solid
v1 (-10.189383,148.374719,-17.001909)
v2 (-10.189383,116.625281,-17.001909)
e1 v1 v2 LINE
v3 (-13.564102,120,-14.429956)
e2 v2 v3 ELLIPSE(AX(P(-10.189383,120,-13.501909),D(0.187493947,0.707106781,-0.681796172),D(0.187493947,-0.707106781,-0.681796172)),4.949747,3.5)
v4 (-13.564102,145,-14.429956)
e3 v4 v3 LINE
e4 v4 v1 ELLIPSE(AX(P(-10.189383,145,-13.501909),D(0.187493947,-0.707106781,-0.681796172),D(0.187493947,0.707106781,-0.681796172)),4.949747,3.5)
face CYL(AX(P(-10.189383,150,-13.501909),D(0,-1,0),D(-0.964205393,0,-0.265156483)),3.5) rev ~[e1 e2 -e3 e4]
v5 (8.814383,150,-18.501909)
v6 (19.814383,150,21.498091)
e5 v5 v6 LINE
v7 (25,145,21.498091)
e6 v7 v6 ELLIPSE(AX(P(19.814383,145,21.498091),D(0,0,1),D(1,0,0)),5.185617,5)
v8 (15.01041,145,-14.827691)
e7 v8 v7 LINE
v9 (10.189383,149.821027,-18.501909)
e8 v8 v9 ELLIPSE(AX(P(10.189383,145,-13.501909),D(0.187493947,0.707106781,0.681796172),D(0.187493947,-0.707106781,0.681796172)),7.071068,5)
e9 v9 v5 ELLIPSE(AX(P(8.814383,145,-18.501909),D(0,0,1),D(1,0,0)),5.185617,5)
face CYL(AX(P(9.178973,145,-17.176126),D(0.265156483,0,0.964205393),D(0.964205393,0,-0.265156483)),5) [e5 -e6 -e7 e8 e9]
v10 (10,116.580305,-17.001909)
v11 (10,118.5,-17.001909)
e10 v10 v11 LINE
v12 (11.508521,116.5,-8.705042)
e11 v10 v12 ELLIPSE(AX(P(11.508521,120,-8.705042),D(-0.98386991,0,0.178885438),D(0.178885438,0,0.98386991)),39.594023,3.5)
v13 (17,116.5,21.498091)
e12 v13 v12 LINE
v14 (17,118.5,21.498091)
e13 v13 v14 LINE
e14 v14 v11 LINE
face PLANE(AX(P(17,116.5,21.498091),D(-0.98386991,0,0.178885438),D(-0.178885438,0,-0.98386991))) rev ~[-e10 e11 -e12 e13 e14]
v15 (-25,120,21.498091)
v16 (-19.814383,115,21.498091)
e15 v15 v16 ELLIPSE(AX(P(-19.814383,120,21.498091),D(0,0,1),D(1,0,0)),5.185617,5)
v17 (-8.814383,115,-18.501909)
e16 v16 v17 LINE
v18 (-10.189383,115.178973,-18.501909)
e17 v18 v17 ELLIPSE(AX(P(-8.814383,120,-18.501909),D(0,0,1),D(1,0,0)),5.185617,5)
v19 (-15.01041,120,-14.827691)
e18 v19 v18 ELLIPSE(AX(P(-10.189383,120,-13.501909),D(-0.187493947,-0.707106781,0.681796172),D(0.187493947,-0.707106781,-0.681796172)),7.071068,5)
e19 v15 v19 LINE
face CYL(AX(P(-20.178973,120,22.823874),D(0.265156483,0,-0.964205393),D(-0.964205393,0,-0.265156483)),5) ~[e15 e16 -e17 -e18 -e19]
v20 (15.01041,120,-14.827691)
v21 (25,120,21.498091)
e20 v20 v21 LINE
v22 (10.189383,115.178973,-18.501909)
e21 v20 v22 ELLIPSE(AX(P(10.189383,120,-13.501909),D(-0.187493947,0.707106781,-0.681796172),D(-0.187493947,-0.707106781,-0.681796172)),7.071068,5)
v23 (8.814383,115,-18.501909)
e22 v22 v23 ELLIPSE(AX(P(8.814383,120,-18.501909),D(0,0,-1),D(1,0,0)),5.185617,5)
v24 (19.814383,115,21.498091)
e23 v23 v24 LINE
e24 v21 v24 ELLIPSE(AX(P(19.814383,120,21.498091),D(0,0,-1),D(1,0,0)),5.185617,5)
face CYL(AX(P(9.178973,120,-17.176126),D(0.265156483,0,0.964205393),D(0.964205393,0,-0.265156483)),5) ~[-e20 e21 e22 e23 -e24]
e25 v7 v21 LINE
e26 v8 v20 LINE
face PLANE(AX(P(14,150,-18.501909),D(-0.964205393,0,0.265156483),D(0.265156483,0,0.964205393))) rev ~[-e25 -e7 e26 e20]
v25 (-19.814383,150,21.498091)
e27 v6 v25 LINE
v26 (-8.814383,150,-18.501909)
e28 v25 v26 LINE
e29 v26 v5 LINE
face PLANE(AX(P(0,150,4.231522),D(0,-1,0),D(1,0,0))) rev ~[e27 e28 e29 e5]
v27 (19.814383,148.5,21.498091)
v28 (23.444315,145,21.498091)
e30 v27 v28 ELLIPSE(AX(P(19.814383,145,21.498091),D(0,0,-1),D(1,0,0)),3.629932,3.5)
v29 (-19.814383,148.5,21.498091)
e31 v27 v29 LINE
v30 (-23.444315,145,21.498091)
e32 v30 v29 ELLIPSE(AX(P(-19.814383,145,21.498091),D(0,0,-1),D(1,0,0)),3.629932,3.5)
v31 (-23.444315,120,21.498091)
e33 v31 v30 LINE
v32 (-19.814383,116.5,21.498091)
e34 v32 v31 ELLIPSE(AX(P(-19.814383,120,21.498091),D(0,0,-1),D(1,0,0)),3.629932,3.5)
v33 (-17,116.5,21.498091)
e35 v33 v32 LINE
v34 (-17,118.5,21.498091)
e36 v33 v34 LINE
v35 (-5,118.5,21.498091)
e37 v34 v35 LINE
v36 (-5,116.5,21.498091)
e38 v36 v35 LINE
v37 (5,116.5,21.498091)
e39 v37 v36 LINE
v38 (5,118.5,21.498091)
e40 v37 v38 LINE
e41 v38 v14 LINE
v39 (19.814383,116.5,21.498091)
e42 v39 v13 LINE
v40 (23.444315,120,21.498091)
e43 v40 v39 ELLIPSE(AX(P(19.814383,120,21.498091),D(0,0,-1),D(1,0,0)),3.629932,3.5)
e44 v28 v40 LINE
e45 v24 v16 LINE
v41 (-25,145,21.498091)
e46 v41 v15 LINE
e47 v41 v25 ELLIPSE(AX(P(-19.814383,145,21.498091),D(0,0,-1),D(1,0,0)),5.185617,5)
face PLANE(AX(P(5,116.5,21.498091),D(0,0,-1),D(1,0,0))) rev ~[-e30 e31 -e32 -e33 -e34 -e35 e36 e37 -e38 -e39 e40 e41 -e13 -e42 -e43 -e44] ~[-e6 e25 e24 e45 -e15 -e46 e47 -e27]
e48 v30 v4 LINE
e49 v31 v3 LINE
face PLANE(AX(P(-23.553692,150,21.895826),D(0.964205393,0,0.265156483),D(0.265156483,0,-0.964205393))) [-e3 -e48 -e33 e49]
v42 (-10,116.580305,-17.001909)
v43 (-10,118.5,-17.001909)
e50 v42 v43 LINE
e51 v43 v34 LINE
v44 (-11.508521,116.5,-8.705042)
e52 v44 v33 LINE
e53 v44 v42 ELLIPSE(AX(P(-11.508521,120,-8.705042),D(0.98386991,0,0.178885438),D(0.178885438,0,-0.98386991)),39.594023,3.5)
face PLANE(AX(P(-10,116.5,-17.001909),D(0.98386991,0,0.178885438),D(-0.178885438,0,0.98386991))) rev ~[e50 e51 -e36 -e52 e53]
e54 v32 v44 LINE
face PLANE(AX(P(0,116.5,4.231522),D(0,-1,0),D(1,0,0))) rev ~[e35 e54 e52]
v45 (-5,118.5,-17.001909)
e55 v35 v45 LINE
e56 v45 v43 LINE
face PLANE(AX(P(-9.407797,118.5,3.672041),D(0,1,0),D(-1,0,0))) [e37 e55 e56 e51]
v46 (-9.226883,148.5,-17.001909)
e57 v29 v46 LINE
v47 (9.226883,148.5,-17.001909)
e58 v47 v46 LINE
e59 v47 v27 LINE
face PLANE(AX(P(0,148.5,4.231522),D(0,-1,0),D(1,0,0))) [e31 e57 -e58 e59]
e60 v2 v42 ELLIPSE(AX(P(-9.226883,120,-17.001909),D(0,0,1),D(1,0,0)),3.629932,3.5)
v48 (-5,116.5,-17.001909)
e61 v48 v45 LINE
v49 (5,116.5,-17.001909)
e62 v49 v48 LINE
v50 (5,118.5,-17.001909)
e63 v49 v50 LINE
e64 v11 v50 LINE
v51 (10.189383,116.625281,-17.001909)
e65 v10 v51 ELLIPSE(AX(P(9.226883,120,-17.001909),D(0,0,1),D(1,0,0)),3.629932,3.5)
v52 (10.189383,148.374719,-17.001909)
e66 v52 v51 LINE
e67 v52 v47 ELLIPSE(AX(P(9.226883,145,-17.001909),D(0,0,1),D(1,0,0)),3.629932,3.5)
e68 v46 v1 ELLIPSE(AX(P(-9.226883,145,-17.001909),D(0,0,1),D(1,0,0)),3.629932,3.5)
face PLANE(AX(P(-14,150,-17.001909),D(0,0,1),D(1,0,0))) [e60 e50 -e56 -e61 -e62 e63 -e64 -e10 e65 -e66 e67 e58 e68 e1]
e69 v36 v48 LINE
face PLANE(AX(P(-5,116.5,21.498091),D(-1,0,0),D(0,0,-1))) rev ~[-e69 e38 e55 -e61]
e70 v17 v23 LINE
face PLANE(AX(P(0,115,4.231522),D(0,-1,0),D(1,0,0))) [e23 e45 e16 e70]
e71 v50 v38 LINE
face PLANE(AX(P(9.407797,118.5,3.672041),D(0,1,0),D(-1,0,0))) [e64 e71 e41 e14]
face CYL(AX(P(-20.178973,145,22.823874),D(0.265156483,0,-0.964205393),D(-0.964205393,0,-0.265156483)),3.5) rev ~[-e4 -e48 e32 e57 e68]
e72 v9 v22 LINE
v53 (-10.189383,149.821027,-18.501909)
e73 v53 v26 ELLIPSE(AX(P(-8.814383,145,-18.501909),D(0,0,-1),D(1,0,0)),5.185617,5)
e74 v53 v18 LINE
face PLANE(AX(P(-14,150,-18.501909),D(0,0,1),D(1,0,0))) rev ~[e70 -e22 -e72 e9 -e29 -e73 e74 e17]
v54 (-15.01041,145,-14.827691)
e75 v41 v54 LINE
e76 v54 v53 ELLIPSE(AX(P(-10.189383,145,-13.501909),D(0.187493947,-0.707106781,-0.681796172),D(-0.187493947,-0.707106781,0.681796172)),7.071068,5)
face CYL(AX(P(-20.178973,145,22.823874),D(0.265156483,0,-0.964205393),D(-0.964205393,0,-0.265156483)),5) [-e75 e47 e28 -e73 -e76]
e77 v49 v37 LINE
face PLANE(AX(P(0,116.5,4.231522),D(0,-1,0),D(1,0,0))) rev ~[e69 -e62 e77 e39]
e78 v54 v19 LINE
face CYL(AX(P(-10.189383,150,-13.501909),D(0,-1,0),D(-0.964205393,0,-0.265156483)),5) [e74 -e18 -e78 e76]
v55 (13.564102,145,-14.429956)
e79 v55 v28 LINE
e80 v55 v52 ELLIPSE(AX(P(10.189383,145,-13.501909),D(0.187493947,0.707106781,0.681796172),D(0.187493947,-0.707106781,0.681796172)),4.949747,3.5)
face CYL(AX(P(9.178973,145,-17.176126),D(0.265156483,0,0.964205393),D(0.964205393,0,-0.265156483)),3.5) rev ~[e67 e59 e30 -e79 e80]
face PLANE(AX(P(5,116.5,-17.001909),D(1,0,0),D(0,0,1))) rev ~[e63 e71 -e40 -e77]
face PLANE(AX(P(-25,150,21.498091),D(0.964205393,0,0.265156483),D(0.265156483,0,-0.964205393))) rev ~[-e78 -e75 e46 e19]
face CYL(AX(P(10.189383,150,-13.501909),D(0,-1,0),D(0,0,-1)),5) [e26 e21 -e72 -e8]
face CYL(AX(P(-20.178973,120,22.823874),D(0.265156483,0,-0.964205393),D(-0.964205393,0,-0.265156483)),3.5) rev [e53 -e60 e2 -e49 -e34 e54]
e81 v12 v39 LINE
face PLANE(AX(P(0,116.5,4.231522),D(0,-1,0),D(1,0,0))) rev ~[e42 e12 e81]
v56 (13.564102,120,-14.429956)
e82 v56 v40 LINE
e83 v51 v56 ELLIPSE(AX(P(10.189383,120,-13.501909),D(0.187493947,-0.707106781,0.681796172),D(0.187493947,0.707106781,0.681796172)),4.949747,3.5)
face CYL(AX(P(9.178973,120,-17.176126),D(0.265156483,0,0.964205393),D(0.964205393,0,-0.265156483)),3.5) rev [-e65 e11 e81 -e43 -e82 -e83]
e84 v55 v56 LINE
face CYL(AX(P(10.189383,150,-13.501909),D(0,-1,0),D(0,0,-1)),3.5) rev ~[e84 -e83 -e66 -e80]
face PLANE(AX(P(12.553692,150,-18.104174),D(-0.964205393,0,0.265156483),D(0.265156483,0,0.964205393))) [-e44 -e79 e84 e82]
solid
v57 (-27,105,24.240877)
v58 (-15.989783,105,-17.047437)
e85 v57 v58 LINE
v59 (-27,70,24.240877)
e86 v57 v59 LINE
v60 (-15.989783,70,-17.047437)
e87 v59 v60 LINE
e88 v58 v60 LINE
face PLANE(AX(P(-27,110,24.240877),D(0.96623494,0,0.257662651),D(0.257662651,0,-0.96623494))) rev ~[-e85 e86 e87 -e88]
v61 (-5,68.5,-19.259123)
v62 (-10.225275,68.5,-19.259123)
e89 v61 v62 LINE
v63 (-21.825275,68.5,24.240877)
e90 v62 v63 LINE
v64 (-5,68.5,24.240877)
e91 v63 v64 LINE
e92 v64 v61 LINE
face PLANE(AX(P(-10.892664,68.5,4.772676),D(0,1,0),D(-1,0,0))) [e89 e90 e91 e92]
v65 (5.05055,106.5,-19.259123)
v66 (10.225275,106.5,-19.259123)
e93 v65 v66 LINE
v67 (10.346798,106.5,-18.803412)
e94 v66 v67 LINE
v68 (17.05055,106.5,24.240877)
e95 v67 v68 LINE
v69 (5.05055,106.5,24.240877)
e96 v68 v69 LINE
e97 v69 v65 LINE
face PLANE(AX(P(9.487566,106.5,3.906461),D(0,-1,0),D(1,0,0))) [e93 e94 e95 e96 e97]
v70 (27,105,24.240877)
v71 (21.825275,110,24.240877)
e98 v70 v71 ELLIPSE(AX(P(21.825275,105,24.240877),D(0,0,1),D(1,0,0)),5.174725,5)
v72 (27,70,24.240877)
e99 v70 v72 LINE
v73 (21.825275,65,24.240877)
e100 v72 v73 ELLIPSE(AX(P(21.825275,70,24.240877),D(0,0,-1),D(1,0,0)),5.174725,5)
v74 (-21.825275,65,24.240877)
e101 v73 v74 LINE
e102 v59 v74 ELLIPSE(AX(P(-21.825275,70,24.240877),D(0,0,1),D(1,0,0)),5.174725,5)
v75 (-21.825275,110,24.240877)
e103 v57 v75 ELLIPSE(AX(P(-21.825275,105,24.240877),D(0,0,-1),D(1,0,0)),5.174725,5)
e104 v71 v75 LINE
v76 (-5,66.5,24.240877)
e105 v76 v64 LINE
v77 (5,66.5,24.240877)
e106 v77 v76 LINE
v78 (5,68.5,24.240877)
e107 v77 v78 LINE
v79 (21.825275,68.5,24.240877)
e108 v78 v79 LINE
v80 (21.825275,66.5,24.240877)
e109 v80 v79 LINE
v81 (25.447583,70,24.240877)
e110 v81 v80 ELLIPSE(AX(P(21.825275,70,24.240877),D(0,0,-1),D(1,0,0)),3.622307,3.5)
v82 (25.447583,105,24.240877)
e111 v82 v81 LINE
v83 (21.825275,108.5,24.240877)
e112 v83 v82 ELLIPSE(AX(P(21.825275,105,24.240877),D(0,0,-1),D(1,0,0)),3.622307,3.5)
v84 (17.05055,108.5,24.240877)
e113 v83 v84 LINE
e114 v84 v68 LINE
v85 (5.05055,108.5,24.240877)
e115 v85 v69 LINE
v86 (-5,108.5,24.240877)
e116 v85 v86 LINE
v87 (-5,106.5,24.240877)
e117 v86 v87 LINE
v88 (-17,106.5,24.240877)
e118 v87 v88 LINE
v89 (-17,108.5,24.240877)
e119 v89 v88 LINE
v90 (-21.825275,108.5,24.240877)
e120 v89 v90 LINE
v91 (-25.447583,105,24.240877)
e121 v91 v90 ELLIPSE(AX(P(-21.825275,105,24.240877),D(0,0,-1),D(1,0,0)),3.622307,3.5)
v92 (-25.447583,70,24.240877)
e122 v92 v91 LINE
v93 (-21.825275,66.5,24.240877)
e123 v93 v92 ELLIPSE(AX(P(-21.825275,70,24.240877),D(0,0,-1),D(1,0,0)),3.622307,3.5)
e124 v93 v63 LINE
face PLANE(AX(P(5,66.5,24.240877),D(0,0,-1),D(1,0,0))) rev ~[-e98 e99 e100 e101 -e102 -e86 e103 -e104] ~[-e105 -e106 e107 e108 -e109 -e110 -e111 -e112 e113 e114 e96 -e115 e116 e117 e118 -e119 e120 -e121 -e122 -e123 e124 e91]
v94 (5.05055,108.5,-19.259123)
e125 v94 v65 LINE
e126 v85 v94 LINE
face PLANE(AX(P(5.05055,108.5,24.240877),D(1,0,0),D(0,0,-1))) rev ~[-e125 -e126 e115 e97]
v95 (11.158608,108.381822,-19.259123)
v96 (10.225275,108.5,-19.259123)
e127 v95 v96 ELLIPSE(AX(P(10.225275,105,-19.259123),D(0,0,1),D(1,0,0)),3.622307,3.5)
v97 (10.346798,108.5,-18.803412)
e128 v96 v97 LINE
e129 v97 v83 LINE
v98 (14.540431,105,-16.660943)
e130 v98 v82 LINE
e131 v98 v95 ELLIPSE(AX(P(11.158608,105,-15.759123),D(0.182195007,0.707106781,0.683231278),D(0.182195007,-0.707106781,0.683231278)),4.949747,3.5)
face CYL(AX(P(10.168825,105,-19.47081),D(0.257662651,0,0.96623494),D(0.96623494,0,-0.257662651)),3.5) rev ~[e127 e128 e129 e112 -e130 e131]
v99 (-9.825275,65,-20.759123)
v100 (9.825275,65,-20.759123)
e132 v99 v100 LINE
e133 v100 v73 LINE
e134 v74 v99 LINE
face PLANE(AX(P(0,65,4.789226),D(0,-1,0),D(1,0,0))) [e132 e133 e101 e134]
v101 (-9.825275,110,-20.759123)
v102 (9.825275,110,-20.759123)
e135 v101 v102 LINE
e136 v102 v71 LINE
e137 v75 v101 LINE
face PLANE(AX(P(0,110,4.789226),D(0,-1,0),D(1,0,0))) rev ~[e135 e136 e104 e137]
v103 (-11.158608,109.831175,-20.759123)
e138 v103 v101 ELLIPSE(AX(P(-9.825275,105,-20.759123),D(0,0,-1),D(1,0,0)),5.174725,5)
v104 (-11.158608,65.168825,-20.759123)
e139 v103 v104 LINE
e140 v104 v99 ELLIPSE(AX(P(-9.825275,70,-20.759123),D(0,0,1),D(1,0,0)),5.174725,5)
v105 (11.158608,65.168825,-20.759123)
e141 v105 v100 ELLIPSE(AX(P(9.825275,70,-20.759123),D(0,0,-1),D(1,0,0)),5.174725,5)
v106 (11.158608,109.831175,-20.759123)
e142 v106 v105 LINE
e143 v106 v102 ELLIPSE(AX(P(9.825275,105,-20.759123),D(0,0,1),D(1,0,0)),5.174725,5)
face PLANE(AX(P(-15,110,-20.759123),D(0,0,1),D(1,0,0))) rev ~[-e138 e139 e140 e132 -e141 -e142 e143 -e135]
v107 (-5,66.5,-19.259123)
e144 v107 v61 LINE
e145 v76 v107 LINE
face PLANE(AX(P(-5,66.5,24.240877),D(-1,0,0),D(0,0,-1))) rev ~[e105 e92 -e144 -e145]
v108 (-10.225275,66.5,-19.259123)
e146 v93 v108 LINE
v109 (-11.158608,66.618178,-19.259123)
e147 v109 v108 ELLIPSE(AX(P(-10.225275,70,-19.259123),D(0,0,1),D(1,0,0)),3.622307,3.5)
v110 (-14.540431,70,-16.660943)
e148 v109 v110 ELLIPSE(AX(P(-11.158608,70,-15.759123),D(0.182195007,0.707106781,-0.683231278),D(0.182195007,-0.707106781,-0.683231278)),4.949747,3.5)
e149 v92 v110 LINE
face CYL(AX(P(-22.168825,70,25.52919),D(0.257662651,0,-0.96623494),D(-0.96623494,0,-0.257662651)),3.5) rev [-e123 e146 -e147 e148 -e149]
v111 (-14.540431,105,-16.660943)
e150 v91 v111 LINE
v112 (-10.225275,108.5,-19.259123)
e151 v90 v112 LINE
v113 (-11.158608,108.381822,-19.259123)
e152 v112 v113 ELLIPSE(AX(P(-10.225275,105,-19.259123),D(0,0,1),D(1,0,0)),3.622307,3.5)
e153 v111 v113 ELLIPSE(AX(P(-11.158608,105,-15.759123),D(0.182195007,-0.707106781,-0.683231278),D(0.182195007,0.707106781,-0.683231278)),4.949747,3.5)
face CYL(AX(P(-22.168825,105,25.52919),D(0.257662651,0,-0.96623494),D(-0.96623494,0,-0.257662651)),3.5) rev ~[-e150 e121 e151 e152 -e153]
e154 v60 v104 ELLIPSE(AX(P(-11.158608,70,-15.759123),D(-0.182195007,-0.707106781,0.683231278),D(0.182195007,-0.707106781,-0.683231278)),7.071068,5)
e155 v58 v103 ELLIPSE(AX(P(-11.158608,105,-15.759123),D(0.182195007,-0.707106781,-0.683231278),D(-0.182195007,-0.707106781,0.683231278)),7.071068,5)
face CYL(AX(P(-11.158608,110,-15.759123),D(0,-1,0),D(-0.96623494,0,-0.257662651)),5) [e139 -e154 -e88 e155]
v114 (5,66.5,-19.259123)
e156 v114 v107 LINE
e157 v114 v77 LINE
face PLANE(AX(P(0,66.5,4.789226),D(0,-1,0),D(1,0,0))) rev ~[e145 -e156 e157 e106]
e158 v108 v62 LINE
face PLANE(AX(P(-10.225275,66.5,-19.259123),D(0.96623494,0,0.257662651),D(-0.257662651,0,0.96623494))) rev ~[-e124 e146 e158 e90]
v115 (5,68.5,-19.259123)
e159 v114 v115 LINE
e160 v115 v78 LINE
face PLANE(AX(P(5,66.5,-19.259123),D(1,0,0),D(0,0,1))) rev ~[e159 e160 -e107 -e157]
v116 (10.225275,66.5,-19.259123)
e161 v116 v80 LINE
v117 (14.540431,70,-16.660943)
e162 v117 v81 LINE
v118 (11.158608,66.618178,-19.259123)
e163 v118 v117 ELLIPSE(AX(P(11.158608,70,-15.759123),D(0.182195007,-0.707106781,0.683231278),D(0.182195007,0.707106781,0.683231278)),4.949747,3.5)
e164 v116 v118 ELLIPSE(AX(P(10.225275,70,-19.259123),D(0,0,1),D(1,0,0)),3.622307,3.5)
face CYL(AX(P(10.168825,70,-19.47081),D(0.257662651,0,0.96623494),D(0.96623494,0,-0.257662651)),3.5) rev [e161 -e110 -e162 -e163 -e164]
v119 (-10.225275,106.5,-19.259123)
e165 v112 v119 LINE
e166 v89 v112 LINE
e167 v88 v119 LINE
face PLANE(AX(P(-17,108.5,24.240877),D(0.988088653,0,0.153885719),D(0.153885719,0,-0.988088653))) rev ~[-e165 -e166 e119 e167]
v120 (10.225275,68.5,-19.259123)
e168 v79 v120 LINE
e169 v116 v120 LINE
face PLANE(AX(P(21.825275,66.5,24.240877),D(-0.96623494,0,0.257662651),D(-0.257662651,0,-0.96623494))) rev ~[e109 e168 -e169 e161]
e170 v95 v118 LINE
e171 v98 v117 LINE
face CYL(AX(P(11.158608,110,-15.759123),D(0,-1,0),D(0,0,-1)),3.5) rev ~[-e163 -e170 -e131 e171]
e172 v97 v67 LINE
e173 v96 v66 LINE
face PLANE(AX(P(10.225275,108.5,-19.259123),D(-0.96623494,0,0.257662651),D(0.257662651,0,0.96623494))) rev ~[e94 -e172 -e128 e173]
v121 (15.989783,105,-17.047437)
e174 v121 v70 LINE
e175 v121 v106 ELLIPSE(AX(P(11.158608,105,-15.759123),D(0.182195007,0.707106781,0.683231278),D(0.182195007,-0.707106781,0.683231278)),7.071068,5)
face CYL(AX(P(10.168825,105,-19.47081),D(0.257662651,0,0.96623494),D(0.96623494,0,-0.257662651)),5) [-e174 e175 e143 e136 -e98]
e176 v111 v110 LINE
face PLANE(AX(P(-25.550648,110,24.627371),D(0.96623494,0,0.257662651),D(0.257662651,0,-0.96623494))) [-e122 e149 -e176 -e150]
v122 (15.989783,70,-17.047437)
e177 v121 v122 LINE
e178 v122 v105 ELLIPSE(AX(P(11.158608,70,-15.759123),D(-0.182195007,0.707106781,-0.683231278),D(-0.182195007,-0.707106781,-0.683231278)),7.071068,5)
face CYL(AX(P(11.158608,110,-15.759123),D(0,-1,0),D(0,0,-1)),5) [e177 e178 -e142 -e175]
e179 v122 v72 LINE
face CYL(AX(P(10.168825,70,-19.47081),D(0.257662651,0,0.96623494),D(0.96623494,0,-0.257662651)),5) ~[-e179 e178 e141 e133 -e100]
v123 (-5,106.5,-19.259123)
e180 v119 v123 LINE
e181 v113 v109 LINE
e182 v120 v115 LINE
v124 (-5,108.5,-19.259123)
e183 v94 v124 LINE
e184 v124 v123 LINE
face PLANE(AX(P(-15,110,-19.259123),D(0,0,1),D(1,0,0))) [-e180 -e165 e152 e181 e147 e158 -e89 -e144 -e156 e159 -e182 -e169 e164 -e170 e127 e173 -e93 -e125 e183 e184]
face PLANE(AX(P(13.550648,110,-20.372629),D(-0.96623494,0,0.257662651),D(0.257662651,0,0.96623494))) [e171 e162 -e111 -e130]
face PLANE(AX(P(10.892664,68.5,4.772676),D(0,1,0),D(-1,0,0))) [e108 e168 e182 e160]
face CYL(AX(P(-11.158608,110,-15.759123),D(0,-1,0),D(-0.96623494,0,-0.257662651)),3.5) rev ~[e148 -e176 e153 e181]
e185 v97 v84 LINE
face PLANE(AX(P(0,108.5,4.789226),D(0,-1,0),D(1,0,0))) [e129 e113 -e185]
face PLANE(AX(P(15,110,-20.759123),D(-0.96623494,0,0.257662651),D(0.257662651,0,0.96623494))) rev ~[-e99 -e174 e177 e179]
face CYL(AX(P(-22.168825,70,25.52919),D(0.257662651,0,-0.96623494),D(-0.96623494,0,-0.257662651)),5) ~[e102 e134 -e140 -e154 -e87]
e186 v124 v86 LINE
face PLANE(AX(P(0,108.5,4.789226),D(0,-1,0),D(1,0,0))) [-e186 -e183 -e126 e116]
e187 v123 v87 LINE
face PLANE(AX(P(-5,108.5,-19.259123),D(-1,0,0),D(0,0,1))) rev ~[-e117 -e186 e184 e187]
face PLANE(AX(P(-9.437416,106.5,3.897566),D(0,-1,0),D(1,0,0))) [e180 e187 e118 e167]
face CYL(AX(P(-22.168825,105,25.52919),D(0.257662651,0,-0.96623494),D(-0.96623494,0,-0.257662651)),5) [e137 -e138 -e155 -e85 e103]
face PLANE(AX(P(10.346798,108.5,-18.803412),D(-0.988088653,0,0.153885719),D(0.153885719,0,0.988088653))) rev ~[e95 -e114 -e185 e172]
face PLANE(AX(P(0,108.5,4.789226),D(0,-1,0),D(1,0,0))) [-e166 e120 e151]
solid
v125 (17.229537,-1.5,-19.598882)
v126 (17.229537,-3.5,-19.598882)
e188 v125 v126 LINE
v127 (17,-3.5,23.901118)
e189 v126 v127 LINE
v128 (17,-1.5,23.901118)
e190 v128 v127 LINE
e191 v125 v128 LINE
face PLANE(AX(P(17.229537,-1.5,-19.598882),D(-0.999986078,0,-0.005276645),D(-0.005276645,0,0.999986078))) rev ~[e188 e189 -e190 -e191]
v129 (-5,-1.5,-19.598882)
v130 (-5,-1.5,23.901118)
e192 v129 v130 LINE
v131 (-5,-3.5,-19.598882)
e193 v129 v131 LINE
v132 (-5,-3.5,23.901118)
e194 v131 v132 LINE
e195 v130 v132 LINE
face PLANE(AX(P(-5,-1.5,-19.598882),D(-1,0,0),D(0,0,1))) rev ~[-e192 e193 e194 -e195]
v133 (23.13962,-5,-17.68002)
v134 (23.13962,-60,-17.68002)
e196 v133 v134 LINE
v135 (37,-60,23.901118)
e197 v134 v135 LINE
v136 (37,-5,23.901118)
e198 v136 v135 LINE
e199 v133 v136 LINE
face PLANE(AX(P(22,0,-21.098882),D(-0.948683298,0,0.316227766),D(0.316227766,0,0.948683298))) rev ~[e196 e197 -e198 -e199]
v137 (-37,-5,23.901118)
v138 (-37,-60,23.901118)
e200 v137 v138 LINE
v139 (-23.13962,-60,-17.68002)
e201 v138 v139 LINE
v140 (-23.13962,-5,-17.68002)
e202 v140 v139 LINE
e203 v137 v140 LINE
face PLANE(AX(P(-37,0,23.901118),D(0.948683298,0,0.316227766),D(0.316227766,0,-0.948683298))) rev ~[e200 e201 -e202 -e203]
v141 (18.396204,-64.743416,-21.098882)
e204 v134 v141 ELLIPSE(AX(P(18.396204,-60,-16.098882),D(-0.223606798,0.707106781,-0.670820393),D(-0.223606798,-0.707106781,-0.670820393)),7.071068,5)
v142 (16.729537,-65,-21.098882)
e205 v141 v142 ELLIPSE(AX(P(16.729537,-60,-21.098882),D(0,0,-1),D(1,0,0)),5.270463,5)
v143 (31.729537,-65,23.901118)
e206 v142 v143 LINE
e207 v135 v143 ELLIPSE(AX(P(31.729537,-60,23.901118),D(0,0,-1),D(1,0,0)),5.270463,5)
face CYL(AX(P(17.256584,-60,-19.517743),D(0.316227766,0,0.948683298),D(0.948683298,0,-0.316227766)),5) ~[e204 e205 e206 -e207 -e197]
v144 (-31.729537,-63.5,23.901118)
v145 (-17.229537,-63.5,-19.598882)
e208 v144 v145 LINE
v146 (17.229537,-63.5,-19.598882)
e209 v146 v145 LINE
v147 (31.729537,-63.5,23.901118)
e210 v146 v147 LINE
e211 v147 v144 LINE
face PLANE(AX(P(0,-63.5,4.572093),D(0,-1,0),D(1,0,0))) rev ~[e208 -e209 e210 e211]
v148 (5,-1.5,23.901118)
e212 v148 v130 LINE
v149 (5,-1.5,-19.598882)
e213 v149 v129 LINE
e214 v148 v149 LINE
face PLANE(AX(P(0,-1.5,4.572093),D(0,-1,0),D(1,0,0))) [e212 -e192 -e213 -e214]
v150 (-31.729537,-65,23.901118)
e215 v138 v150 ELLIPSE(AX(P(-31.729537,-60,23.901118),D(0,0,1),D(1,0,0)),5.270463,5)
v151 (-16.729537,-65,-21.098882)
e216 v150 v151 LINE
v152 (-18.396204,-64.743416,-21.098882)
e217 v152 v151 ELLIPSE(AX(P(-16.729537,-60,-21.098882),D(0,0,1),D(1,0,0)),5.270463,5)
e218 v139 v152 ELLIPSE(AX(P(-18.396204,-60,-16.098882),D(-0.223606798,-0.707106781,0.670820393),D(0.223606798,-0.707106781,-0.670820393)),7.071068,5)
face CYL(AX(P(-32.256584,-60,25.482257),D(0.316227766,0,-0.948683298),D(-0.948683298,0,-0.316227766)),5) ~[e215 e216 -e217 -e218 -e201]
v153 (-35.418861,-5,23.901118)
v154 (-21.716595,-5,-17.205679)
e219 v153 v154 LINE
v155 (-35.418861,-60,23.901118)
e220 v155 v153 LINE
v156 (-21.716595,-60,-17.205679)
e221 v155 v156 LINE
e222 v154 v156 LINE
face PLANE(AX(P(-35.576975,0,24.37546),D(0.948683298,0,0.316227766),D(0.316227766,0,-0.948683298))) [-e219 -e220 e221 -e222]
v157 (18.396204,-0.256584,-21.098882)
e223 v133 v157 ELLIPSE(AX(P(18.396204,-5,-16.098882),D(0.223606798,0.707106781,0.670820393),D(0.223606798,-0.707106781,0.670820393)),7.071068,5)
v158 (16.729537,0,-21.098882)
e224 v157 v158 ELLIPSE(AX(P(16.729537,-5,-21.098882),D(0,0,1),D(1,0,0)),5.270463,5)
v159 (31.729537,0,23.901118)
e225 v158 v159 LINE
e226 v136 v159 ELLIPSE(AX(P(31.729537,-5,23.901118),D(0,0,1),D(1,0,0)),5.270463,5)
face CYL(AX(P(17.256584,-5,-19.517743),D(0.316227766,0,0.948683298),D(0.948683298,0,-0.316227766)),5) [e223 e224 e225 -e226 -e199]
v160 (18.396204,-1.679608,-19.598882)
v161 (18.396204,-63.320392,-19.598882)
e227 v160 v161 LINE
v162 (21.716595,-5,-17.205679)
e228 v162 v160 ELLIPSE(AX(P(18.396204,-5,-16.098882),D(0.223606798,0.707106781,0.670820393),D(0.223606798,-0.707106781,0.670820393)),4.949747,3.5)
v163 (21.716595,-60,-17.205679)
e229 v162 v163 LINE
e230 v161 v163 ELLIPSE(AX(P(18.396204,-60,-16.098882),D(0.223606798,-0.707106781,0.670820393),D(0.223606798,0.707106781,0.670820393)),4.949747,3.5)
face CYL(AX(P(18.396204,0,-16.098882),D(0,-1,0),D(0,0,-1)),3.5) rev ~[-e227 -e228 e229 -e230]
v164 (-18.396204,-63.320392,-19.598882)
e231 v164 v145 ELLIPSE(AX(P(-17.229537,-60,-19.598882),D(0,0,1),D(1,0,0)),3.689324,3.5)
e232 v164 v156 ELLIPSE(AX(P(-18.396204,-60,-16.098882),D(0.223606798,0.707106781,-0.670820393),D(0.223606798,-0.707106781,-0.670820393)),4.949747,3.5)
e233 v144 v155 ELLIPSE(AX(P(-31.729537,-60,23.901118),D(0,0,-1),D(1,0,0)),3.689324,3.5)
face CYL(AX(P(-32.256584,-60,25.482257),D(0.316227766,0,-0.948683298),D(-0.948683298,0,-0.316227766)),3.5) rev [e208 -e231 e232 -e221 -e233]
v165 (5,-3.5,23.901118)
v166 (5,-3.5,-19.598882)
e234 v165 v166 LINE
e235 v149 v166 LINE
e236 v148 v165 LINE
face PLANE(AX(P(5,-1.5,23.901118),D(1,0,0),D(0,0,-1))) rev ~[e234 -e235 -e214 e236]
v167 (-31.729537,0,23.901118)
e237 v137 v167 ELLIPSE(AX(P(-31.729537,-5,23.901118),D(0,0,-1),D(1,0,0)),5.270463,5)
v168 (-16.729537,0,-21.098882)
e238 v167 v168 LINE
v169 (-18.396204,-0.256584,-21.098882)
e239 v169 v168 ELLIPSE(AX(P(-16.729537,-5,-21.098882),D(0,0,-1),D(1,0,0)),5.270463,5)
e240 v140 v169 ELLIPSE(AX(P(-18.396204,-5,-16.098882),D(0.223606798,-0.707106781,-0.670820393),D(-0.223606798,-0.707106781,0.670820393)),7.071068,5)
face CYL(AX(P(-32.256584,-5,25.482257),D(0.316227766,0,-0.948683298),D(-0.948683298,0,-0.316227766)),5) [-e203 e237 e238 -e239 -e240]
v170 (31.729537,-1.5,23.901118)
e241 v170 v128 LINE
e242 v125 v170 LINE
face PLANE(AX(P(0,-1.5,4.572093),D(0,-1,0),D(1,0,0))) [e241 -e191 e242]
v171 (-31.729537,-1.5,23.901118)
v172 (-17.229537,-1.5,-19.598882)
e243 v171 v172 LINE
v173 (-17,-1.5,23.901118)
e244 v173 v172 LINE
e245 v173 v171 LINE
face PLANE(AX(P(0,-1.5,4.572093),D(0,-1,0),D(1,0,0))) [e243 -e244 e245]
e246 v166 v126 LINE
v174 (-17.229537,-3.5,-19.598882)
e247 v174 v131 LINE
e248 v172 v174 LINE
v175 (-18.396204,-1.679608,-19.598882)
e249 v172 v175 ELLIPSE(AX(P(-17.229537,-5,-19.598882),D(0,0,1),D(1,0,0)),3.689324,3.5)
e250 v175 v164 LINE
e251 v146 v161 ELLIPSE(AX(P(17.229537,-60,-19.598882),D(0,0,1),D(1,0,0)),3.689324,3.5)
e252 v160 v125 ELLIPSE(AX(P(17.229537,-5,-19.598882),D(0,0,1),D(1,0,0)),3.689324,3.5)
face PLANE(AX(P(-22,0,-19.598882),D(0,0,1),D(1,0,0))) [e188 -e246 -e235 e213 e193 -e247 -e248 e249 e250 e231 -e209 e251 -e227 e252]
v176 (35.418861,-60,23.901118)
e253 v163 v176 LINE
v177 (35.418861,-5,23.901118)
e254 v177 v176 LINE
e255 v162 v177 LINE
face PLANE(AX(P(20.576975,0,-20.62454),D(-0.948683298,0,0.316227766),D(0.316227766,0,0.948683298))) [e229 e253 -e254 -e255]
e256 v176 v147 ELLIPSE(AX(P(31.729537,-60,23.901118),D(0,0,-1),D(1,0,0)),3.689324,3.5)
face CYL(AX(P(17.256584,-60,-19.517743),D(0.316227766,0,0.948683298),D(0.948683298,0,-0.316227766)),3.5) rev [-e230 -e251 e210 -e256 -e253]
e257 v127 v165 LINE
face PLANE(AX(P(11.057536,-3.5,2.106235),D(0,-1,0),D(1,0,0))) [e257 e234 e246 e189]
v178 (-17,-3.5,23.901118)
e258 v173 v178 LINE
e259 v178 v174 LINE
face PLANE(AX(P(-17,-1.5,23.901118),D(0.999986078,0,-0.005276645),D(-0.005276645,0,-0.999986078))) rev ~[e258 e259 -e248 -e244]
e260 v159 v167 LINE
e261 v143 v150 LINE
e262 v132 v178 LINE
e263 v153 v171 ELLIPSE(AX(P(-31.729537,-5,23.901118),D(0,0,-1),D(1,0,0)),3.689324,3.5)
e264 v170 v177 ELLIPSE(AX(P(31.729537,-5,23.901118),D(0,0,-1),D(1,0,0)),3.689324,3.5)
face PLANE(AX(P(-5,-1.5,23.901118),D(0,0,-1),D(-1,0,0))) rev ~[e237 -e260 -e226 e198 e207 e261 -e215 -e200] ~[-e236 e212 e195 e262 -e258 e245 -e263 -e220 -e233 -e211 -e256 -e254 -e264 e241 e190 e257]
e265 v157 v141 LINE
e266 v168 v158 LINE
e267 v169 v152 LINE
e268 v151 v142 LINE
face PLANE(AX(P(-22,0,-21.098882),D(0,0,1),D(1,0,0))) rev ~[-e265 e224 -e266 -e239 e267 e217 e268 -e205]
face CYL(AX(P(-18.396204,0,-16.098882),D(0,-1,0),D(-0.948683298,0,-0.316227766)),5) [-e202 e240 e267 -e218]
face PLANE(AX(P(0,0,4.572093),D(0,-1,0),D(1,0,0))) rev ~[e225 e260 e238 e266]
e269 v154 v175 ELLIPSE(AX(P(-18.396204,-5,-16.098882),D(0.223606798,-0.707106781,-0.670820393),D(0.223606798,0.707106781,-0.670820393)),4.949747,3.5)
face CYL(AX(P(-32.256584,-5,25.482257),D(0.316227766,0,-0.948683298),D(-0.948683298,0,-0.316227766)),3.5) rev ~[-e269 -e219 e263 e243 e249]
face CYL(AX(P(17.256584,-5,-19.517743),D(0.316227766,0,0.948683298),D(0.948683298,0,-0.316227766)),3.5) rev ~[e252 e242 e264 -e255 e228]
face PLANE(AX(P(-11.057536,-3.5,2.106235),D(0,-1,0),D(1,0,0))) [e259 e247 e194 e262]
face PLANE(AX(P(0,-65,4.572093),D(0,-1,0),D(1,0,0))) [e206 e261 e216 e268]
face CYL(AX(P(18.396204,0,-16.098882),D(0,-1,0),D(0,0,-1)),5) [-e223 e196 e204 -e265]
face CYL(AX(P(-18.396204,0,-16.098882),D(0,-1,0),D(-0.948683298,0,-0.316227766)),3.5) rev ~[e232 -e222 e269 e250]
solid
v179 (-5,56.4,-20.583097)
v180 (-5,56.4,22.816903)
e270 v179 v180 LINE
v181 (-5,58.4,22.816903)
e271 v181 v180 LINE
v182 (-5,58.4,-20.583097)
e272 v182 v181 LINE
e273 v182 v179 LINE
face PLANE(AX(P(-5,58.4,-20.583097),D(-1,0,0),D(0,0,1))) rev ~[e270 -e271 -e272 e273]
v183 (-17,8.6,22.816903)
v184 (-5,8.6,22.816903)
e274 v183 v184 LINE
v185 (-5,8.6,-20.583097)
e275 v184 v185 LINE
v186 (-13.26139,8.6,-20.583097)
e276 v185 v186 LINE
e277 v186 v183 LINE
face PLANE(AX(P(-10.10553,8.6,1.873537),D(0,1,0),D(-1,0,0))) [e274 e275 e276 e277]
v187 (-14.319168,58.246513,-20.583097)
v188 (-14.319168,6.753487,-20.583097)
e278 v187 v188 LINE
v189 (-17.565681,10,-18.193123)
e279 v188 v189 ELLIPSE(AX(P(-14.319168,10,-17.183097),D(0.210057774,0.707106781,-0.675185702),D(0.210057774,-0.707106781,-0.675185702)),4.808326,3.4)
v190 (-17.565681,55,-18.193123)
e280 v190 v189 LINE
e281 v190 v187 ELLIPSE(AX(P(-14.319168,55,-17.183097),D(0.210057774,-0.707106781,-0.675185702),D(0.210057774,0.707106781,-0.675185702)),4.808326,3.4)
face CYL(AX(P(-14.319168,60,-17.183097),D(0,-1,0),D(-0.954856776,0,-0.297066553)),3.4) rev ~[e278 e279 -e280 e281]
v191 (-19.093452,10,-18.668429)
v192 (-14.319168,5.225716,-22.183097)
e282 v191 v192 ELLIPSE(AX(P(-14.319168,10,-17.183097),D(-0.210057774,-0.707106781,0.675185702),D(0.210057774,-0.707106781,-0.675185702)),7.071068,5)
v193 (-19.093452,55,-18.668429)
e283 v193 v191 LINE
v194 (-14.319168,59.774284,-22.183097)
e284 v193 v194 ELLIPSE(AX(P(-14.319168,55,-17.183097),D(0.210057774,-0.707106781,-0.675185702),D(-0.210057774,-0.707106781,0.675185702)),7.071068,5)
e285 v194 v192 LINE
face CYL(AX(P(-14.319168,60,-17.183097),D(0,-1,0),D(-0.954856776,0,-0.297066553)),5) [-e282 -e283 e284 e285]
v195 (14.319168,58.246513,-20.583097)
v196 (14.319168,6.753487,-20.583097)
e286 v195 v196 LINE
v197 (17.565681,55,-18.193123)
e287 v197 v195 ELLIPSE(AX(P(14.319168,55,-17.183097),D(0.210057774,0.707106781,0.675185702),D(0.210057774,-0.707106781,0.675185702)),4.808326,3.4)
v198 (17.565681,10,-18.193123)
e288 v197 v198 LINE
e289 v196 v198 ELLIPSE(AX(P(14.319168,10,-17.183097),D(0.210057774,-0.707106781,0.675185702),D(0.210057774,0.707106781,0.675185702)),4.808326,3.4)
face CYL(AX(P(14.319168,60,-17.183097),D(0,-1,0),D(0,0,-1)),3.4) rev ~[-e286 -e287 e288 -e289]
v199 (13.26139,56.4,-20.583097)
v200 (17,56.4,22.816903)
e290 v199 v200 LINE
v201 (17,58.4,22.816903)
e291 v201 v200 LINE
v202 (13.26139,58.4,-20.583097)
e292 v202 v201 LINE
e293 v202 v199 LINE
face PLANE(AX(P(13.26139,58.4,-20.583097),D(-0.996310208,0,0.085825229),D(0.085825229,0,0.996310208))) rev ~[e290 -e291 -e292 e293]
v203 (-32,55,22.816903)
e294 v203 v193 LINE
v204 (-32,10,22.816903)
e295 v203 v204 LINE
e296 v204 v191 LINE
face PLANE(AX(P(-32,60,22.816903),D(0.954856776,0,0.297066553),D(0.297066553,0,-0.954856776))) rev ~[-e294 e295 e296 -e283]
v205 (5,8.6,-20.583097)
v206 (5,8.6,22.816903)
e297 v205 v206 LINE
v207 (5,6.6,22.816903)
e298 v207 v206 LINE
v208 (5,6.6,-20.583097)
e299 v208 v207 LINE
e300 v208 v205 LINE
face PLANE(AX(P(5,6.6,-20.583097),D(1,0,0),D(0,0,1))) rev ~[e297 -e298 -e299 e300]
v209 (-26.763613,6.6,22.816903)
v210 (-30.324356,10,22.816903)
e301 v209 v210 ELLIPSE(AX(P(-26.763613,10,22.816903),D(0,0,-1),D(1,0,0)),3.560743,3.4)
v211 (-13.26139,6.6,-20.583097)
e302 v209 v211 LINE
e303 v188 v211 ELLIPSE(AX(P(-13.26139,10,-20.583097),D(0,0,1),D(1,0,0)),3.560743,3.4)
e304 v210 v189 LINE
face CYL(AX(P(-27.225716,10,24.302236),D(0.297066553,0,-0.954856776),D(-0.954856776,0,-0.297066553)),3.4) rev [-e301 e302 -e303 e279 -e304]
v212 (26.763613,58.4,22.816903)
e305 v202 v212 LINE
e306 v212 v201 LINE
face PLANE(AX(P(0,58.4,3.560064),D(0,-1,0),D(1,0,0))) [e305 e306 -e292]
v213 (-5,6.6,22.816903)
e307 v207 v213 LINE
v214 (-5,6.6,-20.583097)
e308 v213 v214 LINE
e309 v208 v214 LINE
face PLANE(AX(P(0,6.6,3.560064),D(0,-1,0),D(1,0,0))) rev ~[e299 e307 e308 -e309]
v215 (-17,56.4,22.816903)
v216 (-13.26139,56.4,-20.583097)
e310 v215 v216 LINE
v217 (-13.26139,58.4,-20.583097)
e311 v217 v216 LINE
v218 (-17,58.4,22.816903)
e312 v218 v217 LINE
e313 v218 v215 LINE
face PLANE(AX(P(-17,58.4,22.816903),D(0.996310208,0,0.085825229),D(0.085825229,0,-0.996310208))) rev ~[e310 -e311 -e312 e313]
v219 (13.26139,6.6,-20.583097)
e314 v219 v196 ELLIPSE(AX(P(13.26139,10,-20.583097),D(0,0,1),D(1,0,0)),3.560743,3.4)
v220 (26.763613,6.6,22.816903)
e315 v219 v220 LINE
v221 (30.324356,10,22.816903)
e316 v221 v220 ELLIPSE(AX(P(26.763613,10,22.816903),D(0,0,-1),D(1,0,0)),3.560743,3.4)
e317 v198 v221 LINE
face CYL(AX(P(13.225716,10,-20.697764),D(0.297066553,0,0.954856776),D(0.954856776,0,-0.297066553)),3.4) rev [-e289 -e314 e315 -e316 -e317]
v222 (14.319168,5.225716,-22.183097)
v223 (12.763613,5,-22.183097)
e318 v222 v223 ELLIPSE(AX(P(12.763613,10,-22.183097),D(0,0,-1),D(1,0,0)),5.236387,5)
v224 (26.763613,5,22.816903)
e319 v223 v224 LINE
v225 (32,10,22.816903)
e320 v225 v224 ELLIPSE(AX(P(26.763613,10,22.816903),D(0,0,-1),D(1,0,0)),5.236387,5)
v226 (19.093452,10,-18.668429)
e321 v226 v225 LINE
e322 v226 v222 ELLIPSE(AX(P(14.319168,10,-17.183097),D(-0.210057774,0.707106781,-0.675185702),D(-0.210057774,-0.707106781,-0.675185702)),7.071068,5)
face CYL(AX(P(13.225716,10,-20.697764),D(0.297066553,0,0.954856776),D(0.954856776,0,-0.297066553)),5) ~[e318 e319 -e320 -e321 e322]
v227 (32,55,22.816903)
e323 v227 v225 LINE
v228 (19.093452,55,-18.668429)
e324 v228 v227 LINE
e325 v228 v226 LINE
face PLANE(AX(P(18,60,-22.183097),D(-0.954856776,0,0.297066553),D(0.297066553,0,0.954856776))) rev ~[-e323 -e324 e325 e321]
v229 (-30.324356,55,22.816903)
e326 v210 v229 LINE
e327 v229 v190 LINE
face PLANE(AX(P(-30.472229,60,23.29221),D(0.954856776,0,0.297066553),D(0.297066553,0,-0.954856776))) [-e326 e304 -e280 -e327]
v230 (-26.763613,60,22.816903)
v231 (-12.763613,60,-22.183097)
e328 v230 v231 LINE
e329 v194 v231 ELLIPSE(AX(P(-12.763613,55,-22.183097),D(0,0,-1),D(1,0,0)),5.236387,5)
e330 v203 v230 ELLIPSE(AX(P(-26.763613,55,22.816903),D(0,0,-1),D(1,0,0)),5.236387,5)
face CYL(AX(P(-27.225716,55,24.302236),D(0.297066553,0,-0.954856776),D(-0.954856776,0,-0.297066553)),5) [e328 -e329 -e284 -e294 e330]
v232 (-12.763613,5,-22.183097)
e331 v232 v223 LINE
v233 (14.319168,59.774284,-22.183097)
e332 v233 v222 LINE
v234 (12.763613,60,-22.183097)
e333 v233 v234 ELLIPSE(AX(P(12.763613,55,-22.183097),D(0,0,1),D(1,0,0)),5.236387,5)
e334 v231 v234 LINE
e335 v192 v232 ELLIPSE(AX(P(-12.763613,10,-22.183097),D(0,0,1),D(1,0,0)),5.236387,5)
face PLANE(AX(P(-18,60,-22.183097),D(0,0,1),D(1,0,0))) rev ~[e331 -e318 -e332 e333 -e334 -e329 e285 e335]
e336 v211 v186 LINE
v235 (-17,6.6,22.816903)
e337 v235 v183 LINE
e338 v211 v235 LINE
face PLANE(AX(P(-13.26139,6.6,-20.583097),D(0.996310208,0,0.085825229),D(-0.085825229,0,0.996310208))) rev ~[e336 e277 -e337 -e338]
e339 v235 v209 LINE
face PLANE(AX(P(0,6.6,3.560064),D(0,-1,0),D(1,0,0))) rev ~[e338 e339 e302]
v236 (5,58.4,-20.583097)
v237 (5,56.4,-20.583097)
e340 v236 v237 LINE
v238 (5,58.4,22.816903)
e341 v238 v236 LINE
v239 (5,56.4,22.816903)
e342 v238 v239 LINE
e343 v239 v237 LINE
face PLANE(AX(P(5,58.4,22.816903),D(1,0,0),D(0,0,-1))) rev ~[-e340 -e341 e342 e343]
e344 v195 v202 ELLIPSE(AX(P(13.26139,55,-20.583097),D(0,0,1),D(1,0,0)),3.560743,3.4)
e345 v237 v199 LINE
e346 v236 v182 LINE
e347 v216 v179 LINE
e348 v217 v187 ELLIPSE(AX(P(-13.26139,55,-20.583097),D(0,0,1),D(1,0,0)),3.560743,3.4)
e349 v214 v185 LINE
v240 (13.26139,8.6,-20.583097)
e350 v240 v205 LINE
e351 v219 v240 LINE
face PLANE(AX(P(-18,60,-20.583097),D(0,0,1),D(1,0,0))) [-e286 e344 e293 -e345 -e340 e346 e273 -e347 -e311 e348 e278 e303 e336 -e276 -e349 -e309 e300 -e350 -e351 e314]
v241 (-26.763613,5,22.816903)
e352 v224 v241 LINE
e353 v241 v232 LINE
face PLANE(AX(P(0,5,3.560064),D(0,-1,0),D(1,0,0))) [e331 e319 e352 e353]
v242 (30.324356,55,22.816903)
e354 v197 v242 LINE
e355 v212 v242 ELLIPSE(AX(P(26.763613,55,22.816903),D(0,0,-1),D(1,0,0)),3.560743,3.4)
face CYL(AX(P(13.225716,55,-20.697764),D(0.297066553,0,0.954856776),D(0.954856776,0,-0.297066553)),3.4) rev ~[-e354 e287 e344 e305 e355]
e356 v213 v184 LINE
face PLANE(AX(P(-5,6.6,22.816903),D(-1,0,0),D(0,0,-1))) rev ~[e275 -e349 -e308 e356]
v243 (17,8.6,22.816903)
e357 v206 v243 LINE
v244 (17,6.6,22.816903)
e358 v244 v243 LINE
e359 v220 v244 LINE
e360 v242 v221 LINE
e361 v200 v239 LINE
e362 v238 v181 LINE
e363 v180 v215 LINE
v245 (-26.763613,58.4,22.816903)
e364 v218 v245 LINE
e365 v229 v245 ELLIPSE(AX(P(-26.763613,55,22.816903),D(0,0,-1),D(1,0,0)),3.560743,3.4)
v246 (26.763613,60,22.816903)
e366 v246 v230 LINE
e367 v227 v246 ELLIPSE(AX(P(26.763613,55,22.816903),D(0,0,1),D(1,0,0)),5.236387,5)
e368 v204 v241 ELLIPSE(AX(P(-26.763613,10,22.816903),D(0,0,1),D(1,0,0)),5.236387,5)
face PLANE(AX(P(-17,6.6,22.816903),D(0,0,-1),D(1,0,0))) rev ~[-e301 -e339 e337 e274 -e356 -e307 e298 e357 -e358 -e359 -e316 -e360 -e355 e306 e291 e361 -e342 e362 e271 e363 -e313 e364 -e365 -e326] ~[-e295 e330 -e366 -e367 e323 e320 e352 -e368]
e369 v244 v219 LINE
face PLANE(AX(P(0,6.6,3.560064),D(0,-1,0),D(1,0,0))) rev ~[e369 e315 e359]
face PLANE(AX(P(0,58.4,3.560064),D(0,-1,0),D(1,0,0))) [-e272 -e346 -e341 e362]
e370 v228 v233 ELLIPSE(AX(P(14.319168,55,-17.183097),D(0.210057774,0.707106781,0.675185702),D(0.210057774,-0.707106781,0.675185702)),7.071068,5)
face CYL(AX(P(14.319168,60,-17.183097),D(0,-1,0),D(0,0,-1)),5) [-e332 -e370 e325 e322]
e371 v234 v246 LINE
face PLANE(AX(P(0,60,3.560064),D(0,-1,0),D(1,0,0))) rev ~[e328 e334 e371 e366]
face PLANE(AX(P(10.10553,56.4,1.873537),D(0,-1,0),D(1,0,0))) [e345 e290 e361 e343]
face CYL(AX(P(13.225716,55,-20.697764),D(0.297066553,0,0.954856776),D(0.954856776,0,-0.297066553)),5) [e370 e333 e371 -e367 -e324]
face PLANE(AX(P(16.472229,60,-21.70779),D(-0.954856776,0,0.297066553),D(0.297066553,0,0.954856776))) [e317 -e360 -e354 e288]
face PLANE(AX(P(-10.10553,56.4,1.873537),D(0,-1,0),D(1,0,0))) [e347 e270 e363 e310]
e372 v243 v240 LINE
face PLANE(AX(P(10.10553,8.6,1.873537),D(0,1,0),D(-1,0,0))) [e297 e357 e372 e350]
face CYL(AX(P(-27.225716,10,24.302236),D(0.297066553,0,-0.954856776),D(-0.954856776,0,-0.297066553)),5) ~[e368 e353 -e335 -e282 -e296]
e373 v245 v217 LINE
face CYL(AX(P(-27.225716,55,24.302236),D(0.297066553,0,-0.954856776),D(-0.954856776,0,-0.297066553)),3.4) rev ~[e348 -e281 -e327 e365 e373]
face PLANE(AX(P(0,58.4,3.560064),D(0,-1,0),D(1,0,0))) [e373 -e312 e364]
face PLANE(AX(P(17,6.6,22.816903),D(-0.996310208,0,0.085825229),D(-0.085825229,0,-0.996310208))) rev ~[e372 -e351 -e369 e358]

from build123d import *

# Parameters (mm, degrees)
F1_DEPTH  = 65
F2_R      = 5
F5_DEPTH  = 55
F6_R      = 5
F9_DEPTH  = 45
F10_R     = 5
F13_DEPTH = 35
F14_R     = 5
F15_T     = -1.6
F16_T     = -1.5
F17_T     = -1.5
F18_T     = -1.5
F20_DEPTH = 2
F22_DEPTH = 2
F24_DEPTH = 2
F26_DEPTH = 2
F28_DEPTH = 2
F30_DEPTH = 2


# Not quite as in the source:
# - a feature names something its author has since deleted; it is built from what else it names


with BuildPart() as f1:
    # F0 (on Front) → F1 (new body)
    with BuildSketch(Plane.XZ):
        Polygon((37, 23.9011184353), (0, 23.9011184353), (-37, 23.9011184353), (-22, -21.0988815647), (0, -21.0988815647), (22, -21.0988815647), align=None)
    extrude(amount=F1_DEPTH)

    # F2
    f2_edges = [f1.edges().sort_by_distance(p)[0] for p in [
        (-22, -32.5, -21.098882),
        (22, -32.5, -21.098882),
        (-29.5, -65, 1.401118),
        (29.5, -65, 1.401118),
        (29.5, 0, 1.401118),
        (-29.5, 0, 1.401118),
    ]]
    fillet(f2_edges, radius=F2_R)

    # F17
    f17_openings = [f1.faces().sort_by_distance(p)[0] for p in [
        (0, -32.5, 23.901118),
    ]]
    offset(amount=F17_T, openings=f17_openings)

    # F29 (on face) → F30 (join)
    with BuildSketch(Plane.XZ.offset(1.5)):
        Polygon((-5, -19.5988815647), (-5, 23.9011184353), (-17, 23.9011184353), (-17.2295372331, -19.5988815647), align=None)
        Polygon((17, 23.9011184353), (5, 23.9011184353), (5, -19.5988815647), (17.2295372331, -19.5988815647), align=None)
    extrude(amount=F30_DEPTH)


with BuildPart() as f5:
    # F4 (on offset) → F5 (new body)
    with BuildSketch(Plane.XZ.offset(-60)):
        Polygon((32, 22.8169034502), (0, 22.8169034502), (-32, 22.8169034502), (-18, -22.1830965498), (0, -22.1830965498), (18, -22.1830965498), align=None)
    extrude(amount=F5_DEPTH)

    # F6
    f6_edges = [f5.edges().sort_by_distance(p)[0] for p in [
        (25, 60, 0.316903),
        (-25, 60, 0.316903),
        (18, 32.5, -22.183097),
        (-18, 32.5, -22.183097),
        (-25, 5, 0.316903),
        (25, 5, 0.316903),
    ]]
    fillet(f6_edges, radius=F6_R)

    # F15
    f15_openings = [f5.faces().sort_by_distance(p)[0] for p in [
        (0, 32.5, 22.816903),
    ]]
    offset(amount=F15_T, openings=f15_openings)

    # F25 (on face) → F26 (join)
    with BuildSketch(Plane.XZ.offset(-58.4)):
        Polygon((-5, -20.5830965498), (-5, 22.8169034502), (-17, 22.8169034502), (-13.2613903698, -20.5830965498), align=None)
        Polygon((17, 22.8169034502), (5, 22.8169034502), (5, -20.5830965498), (13.2613903698, -20.5830965498), align=None)
    extrude(amount=F26_DEPTH)

    # F27 (on face) → F28 (join)
    with BuildSketch(Plane(origin=(0, 6.6, 0), x_dir=(-1, 0, 0), z_dir=(0, 1, 0))):
        Polygon((5, 22.8169034502), (5, -20.5830965498), (13.2613903698, -20.5830965498), (17, 22.8169034502), align=None)
        Polygon((-13.2613903698, -20.5830965498), (-5, -20.5830965498), (-5, 22.8169034502), (-17, 22.8169034502), align=None)
    extrude(amount=F28_DEPTH)


with BuildPart() as f9:
    # F8 (on offset) → F9 (new body)
    with BuildSketch(Plane.XZ.offset(-110)):
        Polygon((27, 24.2408766891), (0, 24.2408766891), (-27, 24.2408766891), (-15, -20.7591233109), (0, -20.7591233109), (15, -20.7591233109), align=None)
    extrude(amount=F9_DEPTH)

    # F10
    f10_edges = [f9.edges().sort_by_distance(p)[0] for p in [
        (21, 110, 1.740877),
        (-21, 110, 1.740877),
        (15, 87.5, -20.759123),
        (-15, 87.5, -20.759123),
        (21, 65, 1.740877),
        (-21, 65, 1.740877),
    ]]
    fillet(f10_edges, radius=F10_R)

    # F18
    f18_openings = [f9.faces().sort_by_distance(p)[0] for p in [
        (0, 87.5, 24.240877),
    ]]
    offset(amount=F18_T, openings=f18_openings)

    # F19 (on face) → F20 (join)
    with BuildSketch(Plane.XZ.offset(-108.5)):
        Polygon((-10.2252751012, -19.2591233109), (-5, -19.2591233109), (-5, 24.2408766891), (-17, 24.2408766891), align=None)
        Polygon((5.0505502025, 24.2408766891), (5.0505502025, -19.2591233109), (10.2252751012, -19.2591233109), (10.346798193, -18.8034117168), (17.0505502025, 24.2408766891), align=None)
    extrude(amount=F20_DEPTH)

    # F21 (on face) → F22 (join)
    with BuildSketch(Plane(origin=(0, 66.5, 0), x_dir=(-1, 0, 0), z_dir=(0, 1, 0))):
        Polygon((-10.2252751012, -19.2591233109), (-5, -19.2591233109), (-5, 24.2408766891), (-21.8252751012, 24.2408766891), align=None)
        Polygon((5, -19.2591233109), (10.2252751012, -19.2591233109), (21.8252751012, 24.2408766891), (5, 24.2408766891), align=None)
    extrude(amount=F22_DEPTH)


with BuildPart() as f13:
    # F12 (on offset) → F13 (new body)
    with BuildSketch(Plane.XZ.offset(-150)):
        Polygon((25, 21.4980914434), (0, 21.4980914434), (-25, 21.4980914434), (-14, -18.5019085566), (0, -18.5019085566), (14, -18.5019085566), align=None)
    extrude(amount=F13_DEPTH)

    # F14
    f14_edges = [f13.edges().sort_by_distance(p)[0] for p in [
        (19.5, 150, 1.498091),
        (-19.5, 150, 1.498091),
        (14, 132.5, -18.501909),
        (-14, 132.5, -18.501909),
        (19.5, 115, 1.498091),
        (-19.5, 115, 1.498091),
    ]]
    fillet(f14_edges, radius=F14_R)

    # F16
    f16_openings = [f13.faces().sort_by_distance(p)[0] for p in [
        (0, 132.5, 21.498091),
    ]]
    offset(amount=F16_T, openings=f16_openings)

    # F23 (on face) → F24 (join)
    with BuildSketch(Plane(origin=(0, 116.5, 0), x_dir=(-1, 0, 0), z_dir=(0, 1, 0))):
        Polygon((-10, -17.0019085566), (-5, -17.0019085566), (-5, 21.4980914434), (-17, 21.4980914434), align=None)
        Polygon((5, 21.4980914434), (5, -17.0019085566), (10, -17.0019085566), (17, 21.4980914434), align=None)
        Polygon((5, 21.4980914434), (5, -17.0019085566), (9.2268828718, -17.0019085566), (11.5085212257, -8.7050418152), (17, 21.4980914434), align=None)
    extrude(amount=F24_DEPTH)


solid = Compound([f1.part, f5.part, f9.part, f13.part])
